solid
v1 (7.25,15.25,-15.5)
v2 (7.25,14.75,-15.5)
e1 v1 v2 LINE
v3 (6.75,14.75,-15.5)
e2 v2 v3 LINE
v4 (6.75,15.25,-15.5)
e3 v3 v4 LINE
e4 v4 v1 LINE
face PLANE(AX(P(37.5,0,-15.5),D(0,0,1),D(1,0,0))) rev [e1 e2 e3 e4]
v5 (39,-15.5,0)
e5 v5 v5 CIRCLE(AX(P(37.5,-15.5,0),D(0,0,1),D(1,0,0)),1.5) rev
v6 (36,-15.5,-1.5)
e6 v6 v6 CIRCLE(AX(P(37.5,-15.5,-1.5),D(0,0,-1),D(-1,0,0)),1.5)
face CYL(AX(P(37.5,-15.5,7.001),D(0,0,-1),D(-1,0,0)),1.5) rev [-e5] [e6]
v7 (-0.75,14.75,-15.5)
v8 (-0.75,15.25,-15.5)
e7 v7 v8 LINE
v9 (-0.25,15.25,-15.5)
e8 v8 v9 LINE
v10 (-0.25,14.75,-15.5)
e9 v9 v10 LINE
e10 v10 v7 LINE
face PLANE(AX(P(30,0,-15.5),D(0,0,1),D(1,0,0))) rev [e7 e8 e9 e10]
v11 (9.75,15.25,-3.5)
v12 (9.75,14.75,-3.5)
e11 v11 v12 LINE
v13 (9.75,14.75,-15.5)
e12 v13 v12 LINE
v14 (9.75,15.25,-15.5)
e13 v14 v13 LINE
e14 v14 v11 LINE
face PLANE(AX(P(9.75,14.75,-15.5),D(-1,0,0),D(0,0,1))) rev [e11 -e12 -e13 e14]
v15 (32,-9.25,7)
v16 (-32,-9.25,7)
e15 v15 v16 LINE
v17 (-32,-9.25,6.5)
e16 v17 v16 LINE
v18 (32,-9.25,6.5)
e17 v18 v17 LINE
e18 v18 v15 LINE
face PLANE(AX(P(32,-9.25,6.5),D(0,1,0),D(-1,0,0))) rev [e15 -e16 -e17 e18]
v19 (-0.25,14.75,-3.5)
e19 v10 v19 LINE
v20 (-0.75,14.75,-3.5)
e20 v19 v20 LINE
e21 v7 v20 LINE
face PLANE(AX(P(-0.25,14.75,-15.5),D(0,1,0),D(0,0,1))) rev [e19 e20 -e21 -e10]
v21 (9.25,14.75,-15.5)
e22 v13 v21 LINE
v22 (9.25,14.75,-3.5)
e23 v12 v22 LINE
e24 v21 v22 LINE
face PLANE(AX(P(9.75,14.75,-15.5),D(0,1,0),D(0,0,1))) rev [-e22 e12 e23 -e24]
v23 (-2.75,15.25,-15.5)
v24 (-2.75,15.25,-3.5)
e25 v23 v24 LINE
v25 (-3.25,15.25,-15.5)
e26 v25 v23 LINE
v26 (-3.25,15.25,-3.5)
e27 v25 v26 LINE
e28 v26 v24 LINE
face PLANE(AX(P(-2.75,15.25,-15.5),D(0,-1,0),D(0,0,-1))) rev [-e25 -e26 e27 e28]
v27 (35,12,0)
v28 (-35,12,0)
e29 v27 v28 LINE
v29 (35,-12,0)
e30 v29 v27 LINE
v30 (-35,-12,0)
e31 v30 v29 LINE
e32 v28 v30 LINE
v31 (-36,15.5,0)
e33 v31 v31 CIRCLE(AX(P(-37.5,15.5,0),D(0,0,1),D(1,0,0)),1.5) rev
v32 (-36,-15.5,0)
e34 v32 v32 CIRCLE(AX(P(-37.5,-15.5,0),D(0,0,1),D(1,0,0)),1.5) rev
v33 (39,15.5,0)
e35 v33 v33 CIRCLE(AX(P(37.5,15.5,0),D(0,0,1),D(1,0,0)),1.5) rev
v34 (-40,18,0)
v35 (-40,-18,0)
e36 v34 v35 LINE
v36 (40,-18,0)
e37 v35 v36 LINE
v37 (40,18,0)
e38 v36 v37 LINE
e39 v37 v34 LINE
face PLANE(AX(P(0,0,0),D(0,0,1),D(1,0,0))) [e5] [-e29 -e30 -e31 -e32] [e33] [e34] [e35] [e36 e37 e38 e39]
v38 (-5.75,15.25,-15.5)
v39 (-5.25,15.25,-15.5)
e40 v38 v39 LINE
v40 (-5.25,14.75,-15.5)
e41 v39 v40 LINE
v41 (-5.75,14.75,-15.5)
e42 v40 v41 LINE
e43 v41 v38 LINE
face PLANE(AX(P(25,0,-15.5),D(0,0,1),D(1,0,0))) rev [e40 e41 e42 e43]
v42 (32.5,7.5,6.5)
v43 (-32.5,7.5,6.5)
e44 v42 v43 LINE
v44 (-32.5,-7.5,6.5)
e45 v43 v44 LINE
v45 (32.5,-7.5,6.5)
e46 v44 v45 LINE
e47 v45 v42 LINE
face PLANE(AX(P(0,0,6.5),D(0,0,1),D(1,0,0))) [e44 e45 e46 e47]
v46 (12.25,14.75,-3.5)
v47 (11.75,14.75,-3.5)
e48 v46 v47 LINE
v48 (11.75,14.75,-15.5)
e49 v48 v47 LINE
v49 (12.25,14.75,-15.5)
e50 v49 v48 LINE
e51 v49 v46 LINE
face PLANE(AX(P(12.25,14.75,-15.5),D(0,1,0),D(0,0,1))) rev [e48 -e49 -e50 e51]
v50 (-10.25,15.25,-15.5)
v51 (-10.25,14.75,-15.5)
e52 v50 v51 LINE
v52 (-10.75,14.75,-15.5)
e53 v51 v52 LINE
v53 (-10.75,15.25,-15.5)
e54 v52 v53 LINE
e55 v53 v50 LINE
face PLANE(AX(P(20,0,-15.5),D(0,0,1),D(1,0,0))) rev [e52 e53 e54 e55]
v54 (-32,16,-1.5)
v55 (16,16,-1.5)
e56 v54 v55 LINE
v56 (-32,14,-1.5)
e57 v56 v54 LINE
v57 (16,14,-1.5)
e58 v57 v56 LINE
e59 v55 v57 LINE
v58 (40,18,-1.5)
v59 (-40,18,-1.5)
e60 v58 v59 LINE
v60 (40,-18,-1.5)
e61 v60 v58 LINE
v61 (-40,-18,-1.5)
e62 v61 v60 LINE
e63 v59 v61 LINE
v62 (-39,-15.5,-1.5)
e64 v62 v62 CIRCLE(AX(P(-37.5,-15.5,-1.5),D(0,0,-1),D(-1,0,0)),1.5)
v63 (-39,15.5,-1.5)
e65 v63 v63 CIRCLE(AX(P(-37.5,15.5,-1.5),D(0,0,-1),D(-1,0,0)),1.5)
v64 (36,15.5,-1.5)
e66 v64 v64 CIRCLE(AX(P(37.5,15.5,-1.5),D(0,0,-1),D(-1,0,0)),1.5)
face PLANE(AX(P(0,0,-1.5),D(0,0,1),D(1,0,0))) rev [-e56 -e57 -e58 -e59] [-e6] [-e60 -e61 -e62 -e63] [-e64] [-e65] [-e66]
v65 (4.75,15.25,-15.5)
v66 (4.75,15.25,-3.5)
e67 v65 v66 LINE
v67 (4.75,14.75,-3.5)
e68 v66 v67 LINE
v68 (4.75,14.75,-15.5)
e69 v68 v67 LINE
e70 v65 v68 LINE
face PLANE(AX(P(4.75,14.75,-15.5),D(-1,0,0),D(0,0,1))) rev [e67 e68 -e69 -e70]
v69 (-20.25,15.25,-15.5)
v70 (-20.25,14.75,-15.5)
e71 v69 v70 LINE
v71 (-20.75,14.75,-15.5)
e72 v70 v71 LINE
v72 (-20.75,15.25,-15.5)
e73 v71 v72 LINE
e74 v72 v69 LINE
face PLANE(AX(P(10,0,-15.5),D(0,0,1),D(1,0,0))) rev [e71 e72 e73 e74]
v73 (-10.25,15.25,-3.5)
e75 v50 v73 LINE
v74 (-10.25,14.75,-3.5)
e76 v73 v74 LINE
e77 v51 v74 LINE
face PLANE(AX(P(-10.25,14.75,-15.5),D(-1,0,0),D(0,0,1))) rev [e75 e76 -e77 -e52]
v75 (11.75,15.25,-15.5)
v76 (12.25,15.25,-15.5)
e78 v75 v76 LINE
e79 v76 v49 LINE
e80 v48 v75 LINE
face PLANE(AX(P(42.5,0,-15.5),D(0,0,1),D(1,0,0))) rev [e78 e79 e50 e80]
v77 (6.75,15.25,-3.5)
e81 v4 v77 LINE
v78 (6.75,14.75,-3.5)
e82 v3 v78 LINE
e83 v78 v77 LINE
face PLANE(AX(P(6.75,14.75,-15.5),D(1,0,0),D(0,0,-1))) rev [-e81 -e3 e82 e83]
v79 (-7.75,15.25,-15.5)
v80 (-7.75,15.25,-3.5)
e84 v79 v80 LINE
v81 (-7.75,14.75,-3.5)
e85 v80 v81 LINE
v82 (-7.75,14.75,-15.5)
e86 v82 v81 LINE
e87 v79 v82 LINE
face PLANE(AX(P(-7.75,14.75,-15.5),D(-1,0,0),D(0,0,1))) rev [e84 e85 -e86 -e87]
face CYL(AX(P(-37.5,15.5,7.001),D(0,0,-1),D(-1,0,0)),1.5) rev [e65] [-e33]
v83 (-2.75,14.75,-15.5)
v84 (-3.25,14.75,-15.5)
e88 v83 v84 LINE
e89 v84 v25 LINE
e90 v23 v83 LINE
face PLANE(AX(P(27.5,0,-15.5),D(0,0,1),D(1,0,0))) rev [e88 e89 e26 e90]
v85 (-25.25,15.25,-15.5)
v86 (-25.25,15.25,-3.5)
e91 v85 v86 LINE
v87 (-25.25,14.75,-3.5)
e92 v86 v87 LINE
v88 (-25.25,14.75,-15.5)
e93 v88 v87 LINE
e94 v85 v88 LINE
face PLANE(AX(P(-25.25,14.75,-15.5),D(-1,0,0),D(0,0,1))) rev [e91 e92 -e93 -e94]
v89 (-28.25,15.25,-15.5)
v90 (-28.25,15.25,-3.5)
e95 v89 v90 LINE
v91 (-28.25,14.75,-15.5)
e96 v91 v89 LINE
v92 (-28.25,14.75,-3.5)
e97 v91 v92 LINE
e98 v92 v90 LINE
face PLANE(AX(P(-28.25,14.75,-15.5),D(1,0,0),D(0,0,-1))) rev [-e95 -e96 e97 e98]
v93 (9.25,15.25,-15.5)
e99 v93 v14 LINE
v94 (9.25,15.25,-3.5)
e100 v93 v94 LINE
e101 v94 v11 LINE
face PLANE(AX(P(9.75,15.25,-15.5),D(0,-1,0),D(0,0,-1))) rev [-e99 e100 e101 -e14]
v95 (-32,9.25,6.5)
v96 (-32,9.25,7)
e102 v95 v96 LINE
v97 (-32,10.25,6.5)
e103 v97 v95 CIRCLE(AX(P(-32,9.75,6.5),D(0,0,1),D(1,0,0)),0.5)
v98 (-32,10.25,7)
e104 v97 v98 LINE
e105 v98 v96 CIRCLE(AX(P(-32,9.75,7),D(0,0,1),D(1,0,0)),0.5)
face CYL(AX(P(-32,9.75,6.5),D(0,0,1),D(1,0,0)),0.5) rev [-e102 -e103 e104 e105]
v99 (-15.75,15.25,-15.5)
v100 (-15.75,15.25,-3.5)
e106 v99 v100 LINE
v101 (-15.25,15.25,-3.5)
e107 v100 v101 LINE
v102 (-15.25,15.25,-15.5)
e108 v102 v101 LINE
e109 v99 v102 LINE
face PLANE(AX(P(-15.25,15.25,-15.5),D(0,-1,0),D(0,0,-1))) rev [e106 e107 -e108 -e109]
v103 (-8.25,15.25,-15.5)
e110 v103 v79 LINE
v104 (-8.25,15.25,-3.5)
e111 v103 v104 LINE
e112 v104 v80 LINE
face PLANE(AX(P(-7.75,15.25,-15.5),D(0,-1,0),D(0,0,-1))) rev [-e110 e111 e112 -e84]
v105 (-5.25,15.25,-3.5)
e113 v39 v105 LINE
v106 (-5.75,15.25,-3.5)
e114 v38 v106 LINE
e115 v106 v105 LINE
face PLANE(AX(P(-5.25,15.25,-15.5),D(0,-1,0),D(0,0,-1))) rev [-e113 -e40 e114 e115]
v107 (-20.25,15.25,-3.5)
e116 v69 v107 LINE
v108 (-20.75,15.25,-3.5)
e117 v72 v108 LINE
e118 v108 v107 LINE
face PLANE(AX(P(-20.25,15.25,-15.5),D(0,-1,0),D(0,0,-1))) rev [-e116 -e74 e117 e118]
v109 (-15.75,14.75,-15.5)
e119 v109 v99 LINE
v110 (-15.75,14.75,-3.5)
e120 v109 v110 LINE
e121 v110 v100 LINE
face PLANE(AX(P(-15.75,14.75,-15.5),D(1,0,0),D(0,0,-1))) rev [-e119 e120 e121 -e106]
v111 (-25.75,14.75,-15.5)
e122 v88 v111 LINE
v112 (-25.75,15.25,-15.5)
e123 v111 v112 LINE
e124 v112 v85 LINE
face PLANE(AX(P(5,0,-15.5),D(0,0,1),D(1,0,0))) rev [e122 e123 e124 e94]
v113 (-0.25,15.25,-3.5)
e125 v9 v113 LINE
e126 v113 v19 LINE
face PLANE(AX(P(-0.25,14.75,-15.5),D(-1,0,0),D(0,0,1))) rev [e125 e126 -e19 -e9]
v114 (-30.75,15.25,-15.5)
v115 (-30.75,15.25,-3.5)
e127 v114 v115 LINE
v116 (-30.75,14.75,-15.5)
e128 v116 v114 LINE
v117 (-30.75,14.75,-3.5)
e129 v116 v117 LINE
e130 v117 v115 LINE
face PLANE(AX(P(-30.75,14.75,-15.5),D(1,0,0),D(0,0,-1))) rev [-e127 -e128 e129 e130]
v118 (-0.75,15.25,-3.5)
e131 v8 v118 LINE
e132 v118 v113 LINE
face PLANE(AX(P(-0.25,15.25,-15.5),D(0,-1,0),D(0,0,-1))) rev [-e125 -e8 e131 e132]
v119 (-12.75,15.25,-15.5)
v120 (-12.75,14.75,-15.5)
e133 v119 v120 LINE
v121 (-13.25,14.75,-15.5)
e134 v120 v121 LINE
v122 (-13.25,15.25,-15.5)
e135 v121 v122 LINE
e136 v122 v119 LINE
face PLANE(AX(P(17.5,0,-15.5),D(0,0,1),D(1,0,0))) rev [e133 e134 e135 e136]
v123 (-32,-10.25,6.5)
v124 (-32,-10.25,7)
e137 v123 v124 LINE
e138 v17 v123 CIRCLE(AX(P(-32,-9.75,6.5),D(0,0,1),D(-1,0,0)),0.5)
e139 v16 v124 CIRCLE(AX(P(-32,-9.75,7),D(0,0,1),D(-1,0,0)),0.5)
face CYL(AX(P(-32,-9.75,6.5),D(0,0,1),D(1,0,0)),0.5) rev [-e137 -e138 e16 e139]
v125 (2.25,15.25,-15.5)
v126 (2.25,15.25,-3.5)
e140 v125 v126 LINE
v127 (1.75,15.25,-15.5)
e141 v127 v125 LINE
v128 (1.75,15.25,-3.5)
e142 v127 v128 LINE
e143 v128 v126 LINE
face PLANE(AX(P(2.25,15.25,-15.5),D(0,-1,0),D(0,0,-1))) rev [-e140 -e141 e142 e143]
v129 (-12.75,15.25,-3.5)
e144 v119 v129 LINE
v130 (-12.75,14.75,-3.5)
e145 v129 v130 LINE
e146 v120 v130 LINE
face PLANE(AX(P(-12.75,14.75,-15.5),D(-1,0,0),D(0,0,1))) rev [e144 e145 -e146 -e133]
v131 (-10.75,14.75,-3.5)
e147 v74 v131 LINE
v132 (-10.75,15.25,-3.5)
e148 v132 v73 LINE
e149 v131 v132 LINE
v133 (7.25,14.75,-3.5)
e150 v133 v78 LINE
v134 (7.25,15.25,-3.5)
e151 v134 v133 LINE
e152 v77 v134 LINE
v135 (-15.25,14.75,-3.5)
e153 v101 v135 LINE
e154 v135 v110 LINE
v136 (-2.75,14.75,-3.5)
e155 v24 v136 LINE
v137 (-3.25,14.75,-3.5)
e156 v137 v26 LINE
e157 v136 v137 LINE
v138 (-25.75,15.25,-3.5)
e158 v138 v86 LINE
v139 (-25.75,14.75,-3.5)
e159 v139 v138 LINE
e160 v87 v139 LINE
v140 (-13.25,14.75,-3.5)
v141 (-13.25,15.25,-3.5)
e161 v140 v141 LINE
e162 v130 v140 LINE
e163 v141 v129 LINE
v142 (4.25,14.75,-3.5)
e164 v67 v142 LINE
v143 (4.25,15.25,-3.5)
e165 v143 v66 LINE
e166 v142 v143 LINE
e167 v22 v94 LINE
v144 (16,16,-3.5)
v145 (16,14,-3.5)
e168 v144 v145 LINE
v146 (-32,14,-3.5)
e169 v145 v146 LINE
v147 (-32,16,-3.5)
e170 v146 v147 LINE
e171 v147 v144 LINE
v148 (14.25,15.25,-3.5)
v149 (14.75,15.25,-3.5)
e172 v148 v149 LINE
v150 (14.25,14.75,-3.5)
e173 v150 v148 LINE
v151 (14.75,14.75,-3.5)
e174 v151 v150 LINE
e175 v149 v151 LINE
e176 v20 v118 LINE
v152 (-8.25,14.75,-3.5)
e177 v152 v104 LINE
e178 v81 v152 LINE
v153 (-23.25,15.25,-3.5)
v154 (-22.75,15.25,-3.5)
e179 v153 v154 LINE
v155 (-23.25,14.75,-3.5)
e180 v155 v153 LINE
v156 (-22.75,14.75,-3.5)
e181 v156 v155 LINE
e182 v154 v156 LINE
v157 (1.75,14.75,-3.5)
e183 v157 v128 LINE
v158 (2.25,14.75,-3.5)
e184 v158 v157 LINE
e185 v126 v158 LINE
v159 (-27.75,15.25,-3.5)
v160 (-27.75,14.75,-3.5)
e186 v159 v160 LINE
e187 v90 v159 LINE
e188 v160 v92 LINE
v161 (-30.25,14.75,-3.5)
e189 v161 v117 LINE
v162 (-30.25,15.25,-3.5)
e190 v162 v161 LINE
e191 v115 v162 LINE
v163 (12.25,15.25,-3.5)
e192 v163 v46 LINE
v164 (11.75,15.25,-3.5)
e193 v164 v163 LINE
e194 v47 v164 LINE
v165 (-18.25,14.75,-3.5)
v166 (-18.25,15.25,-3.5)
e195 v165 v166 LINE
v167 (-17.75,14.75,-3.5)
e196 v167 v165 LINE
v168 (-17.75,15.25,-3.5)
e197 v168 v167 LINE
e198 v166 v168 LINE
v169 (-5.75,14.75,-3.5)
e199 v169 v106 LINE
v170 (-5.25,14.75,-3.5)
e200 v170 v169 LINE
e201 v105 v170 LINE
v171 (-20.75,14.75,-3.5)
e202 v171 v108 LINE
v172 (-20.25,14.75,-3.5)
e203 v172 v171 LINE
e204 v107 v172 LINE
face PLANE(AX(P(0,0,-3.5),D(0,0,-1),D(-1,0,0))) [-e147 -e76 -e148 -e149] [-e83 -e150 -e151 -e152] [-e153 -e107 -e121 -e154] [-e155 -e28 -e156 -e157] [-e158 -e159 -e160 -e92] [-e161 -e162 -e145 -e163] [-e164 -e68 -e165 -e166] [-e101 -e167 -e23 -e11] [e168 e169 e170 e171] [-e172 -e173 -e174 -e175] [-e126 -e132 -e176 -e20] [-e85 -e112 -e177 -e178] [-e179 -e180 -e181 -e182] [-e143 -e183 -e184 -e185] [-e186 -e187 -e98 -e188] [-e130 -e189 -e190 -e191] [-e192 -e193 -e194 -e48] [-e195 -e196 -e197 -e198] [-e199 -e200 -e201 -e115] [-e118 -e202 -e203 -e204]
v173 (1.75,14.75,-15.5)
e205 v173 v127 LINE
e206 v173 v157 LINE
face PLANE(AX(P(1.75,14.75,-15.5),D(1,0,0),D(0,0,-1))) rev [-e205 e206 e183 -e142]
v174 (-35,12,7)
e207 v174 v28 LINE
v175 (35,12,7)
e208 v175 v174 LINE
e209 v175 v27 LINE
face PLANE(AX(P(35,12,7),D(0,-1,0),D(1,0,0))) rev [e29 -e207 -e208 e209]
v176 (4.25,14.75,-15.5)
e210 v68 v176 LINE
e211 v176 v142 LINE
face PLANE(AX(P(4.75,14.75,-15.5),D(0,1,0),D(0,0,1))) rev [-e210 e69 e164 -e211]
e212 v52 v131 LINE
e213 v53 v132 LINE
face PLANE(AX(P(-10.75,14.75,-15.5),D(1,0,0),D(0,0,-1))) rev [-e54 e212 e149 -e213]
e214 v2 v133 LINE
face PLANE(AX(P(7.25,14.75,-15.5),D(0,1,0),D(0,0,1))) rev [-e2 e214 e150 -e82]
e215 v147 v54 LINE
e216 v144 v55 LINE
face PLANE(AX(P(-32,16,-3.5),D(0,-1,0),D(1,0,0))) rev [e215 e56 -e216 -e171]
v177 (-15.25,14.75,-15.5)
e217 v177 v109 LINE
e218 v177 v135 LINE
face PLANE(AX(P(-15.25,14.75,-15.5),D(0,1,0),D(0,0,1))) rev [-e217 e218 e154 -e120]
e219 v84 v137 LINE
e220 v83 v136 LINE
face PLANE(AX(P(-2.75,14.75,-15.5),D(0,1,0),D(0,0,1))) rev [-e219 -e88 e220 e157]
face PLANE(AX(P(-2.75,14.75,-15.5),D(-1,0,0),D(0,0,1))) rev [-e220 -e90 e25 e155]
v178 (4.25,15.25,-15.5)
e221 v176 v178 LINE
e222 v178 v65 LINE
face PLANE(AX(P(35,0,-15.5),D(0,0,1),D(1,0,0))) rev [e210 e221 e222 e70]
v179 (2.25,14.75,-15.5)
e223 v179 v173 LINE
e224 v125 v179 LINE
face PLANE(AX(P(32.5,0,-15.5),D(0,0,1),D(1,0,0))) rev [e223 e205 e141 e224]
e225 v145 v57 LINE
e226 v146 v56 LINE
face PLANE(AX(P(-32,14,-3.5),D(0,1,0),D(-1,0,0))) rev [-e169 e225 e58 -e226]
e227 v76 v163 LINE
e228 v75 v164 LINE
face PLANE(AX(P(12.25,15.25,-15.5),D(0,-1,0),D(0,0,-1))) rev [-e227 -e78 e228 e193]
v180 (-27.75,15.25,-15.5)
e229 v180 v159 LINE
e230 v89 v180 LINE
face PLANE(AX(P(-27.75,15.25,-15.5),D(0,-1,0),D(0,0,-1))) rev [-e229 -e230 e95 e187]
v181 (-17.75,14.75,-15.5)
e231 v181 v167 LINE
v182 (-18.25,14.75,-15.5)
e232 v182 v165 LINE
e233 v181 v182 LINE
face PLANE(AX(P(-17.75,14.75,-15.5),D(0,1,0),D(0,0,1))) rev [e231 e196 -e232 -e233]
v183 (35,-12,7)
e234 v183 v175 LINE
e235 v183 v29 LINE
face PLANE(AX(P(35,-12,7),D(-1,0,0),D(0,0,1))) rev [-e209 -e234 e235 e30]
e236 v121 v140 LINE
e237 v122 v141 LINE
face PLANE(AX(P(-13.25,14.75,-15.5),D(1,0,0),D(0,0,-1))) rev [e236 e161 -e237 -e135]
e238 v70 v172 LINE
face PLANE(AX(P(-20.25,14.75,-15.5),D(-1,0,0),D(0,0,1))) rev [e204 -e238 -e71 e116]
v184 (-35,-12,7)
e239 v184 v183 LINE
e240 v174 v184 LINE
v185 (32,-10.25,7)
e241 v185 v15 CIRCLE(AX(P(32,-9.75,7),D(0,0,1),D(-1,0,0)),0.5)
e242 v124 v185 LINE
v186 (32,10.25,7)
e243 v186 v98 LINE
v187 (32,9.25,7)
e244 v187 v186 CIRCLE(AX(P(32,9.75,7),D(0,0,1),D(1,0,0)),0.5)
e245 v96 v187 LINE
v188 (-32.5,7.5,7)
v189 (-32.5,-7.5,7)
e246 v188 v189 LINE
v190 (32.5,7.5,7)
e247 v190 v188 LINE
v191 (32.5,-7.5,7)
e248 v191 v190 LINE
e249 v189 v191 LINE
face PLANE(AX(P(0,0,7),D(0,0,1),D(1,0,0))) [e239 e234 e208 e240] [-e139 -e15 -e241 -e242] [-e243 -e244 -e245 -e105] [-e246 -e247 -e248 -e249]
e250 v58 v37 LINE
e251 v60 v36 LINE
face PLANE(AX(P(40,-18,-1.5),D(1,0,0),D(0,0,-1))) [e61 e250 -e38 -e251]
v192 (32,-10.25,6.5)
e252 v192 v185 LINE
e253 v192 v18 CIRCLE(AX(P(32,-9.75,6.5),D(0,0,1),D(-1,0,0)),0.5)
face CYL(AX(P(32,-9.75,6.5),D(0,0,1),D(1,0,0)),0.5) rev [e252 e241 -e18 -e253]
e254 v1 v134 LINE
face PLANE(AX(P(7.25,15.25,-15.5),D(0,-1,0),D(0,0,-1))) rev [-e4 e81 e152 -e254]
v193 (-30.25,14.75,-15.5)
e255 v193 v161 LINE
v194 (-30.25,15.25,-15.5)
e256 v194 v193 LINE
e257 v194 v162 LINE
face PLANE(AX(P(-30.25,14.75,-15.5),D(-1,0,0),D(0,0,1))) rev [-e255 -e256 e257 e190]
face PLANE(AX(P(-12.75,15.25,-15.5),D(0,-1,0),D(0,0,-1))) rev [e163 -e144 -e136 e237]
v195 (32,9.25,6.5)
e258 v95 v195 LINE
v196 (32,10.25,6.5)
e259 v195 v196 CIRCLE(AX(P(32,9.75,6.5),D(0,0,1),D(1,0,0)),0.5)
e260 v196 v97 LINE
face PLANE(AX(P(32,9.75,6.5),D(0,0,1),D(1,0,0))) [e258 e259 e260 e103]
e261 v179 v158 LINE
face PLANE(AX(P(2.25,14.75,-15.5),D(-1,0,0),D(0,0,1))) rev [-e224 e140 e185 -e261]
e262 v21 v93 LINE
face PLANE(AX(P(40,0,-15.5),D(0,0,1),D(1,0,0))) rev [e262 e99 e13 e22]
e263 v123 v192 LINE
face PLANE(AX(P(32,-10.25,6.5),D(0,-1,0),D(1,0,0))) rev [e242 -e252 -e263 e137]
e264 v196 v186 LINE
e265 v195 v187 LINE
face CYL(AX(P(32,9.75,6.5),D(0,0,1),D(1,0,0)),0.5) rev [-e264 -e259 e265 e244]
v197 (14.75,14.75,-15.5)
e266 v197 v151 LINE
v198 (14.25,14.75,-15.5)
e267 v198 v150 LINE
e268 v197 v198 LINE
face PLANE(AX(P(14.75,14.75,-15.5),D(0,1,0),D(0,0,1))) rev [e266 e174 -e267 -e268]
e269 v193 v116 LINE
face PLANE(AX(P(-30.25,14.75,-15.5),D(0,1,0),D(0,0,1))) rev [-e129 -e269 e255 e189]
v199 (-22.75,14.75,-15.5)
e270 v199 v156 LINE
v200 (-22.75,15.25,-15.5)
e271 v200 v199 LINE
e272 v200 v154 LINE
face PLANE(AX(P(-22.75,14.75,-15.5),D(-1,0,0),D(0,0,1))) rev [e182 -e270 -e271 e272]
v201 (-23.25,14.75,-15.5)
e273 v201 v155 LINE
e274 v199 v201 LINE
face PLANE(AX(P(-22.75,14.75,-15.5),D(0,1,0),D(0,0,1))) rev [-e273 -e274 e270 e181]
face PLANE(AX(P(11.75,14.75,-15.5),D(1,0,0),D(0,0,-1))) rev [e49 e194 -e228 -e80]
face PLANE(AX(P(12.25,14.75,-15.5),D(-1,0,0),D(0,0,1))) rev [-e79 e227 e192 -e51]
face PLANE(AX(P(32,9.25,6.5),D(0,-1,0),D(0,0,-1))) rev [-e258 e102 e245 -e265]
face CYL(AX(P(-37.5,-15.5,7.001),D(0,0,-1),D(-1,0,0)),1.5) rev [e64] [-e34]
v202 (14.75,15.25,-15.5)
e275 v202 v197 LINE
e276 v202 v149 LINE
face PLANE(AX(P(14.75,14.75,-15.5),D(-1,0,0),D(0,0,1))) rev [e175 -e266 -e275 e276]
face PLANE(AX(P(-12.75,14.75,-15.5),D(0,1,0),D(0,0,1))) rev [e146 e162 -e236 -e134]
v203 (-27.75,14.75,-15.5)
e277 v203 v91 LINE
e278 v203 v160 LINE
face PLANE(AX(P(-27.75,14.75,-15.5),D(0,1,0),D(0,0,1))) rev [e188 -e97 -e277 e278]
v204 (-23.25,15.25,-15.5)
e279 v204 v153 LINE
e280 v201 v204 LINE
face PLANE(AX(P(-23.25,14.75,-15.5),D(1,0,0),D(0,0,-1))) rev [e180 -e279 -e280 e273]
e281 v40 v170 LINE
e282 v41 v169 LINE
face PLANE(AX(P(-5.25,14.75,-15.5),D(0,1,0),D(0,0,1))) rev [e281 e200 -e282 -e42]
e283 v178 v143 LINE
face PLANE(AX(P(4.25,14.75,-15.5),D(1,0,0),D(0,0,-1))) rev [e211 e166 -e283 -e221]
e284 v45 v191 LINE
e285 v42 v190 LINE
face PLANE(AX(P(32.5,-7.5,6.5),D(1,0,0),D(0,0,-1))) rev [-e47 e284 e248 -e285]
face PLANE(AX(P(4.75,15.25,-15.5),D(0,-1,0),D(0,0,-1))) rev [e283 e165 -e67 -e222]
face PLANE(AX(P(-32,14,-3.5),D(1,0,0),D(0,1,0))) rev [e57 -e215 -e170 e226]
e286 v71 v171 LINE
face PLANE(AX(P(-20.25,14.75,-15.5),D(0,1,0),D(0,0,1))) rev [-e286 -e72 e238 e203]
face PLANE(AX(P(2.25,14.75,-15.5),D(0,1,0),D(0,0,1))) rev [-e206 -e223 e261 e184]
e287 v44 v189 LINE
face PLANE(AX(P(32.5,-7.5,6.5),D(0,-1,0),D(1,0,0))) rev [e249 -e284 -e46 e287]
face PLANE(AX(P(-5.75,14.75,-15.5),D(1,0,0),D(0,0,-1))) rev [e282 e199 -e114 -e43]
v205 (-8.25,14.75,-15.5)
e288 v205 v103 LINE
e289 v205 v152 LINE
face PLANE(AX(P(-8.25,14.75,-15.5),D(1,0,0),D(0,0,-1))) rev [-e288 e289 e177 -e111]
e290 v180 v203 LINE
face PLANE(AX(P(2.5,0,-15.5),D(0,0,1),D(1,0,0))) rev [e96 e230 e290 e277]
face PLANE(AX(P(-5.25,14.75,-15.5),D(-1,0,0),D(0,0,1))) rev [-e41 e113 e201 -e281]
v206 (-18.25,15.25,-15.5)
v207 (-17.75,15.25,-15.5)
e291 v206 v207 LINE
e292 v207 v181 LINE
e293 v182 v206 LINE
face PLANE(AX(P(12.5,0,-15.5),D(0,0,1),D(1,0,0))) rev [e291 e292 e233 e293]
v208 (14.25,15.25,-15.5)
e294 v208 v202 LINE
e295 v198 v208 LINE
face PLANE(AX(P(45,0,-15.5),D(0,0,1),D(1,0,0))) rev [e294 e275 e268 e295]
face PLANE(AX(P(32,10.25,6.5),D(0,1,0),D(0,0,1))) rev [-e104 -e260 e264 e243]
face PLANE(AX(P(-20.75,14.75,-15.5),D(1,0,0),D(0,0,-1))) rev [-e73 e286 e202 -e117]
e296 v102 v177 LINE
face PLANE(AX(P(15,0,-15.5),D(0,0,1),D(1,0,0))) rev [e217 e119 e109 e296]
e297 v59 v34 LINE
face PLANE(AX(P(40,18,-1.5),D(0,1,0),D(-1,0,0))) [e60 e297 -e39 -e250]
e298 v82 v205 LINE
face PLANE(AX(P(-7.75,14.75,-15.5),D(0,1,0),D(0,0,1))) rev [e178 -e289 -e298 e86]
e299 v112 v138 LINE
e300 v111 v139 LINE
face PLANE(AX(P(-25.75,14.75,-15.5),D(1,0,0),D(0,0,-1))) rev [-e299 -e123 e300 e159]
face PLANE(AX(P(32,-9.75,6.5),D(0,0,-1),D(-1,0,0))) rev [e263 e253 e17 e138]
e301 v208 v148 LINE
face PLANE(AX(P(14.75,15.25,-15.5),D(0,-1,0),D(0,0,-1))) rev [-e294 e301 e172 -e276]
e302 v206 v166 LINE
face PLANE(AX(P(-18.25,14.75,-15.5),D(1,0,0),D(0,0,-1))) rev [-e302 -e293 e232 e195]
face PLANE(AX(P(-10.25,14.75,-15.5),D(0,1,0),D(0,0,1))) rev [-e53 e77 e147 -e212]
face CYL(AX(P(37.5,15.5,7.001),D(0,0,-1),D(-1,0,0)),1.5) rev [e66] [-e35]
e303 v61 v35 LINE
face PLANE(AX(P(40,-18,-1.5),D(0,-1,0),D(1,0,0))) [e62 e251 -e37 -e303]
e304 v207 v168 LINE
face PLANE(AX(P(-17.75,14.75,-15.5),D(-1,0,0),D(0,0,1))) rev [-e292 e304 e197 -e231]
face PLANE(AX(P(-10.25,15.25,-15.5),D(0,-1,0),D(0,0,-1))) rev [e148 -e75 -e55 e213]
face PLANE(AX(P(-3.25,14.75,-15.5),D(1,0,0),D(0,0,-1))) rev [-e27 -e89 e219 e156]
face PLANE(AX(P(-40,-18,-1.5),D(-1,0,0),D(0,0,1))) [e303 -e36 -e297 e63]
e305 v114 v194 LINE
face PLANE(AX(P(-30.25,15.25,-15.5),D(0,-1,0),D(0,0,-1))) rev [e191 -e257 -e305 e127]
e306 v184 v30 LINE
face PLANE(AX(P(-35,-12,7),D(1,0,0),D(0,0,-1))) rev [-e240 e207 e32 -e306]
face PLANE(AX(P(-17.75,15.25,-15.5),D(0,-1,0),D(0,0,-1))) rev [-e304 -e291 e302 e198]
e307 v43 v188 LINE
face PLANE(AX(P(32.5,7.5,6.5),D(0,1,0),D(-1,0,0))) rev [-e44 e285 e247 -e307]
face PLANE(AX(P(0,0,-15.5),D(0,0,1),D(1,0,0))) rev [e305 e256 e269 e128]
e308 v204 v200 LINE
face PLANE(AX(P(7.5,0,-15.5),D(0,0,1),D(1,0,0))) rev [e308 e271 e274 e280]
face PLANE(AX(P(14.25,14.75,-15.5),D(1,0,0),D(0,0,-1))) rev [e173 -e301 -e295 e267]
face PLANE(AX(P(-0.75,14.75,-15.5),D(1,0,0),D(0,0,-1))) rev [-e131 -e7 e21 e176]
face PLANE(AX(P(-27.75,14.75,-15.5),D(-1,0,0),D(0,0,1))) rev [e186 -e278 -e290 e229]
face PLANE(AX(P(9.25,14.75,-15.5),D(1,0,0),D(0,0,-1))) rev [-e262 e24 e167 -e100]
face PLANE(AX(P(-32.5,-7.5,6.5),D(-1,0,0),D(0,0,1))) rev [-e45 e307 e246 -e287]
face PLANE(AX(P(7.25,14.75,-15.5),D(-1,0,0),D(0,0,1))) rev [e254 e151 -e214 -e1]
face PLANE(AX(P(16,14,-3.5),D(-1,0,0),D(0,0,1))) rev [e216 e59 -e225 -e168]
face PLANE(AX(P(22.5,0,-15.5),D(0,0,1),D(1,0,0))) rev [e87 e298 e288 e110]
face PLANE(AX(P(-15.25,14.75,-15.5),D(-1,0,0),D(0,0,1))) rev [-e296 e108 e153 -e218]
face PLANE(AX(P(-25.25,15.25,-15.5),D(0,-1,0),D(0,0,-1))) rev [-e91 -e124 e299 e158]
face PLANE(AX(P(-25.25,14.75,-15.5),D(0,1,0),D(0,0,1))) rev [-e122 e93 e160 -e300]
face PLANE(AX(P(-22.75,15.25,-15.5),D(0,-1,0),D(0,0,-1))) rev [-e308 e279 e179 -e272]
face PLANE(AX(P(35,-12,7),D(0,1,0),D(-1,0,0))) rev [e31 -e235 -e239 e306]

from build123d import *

# Parameters (mm, degrees)
SKETCH1_W           = 80
SKETCH1_H           = 36
BASE_FLANGE1_DEPTH  = 1.5
SKETCH6_W           = 70
SKETCH6_H           = 24
BOSS_EXTRUDE1_DEPTH = 7
SKETCH7_W           = 65
SKETCH7_H           = 15
CUT_EXTRUDE1_DEPTH  = 0.5
CUT_EXTRUDE2_DEPTH  = 0.5
CUT_EXTRUDE3_REACH  = 46.679
SKETCH9_R           = 1.5
SKETCH10_W          = 48
SKETCH10_H          = 2
BOSS_EXTRUDE2_DEPTH = 2
SKETCH11_W          = 0.5
SKETCH11_H          = 0.5
BOSS_EXTRUDE3_DEPTH = 12
LPATTERN1_COUNT     = 19
LPATTERN1_PITCH     = 2.5


# Sheet-metal steps are written as plain solids
with BuildPart() as part:
    # Sketch1 → Base-Flange1 (new body)
    with BuildSketch(Plane.XY):
        Rectangle(SKETCH1_W, SKETCH1_H)
    extrude(amount=-BASE_FLANGE1_DEPTH)

    # Sketch6 → Boss-Extrude1 (add)
    with BuildSketch(Plane.XY):
        Rectangle(SKETCH6_W, SKETCH6_H)
    extrude(amount=BOSS_EXTRUDE1_DEPTH)

    # Sketch7 → Cut-Extrude1 (cut)
    with BuildSketch(Plane.XY.offset(7)):
        Rectangle(SKETCH7_W, SKETCH7_H)
    extrude(amount=-CUT_EXTRUDE1_DEPTH, mode=Mode.SUBTRACT)

    # Sketch8 → Cut-Extrude2 (cut)
    with BuildSketch(Plane.XY.offset(7)):
        with BuildLine():
            Line((32, 9.25), (-32, 9.25))
            ThreePointArc((-32, 9.25), (-32.5, 9.75), (-32, 10.25))
            Line((-32, 10.25), (32, 10.25))
            ThreePointArc((32, 10.25), (32.5, 9.75), (32, 9.25))
        make_face()
        with BuildLine():
            Line((32, -9.25), (-32, -9.25))
            ThreePointArc((-32, -9.25), (-32.5, -9.75), (-32, -10.25))
            Line((-32, -10.25), (32, -10.25))
            ThreePointArc((32, -10.25), (32.5, -9.75), (32, -9.25))
        make_face()
    extrude(amount=-CUT_EXTRUDE2_DEPTH, mode=Mode.SUBTRACT)

    # Sketch9 → Cut-Extrude3 (cut, up to next)
    with BuildSketch(Plane(origin=(0, 0, -1.5), x_dir=(-1, 0, 0), z_dir=(0, 0, -1)), mode=Mode.PRIVATE) as cut_extrude3_sk1:
        with Locations((-37.5, 15.5)):
            Circle(SKETCH9_R)
    cut_extrude3_tool1 = extrude(cut_extrude3_sk1.sketch, amount=-CUT_EXTRUDE3_REACH, mode=Mode.PRIVATE) & part.part
    # Sketch9 → Cut-Extrude3 (cut, up to next)
    with BuildSketch(Plane(origin=(0, 0, -1.5), x_dir=(-1, 0, 0), z_dir=(0, 0, -1)), mode=Mode.PRIVATE) as cut_extrude3_sk2:
        with Locations((-37.5, -15.5)):
            Circle(SKETCH9_R)
    cut_extrude3_tool2 = extrude(cut_extrude3_sk2.sketch, amount=-CUT_EXTRUDE3_REACH, mode=Mode.PRIVATE) & part.part
    # Sketch9 → Cut-Extrude3 (cut, up to next)
    with BuildSketch(Plane(origin=(0, 0, -1.5), x_dir=(-1, 0, 0), z_dir=(0, 0, -1)), mode=Mode.PRIVATE) as cut_extrude3_sk3:
        with Locations((37.5, 15.5)):
            Circle(SKETCH9_R)
    cut_extrude3_tool3 = extrude(cut_extrude3_sk3.sketch, amount=-CUT_EXTRUDE3_REACH, mode=Mode.PRIVATE) & part.part
    # Sketch9 → Cut-Extrude3 (cut, up to next)
    with BuildSketch(Plane(origin=(0, 0, -1.5), x_dir=(-1, 0, 0), z_dir=(0, 0, -1)), mode=Mode.PRIVATE) as cut_extrude3_sk4:
        with Locations((37.5, -15.5)):
            Circle(SKETCH9_R)
    cut_extrude3_tool4 = extrude(cut_extrude3_sk4.sketch, amount=-CUT_EXTRUDE3_REACH, mode=Mode.PRIVATE) & part.part
    add(cut_extrude3_tool1.solids().sort_by_distance((37.5, 15.5, -1.5))[0], mode=Mode.SUBTRACT)
    add(cut_extrude3_tool2.solids().sort_by_distance((37.5, -15.5, -1.5))[0], mode=Mode.SUBTRACT)
    add(cut_extrude3_tool3.solids().sort_by_distance((-37.5, 15.5, -1.5))[0], mode=Mode.SUBTRACT)
    add(cut_extrude3_tool4.solids().sort_by_distance((-37.5, -15.5, -1.5))[0], mode=Mode.SUBTRACT)

    # Sketch10 → Boss-Extrude2 (add)
    with BuildSketch(Plane(origin=(0, 0, -1.5), x_dir=(-1, 0, 0), z_dir=(0, 0, -1))):
        with Locations((8, 15)):
            Rectangle(SKETCH10_W, SKETCH10_H)
    extrude(amount=BOSS_EXTRUDE2_DEPTH)

    # Sketch11 → Boss-Extrude3 (add)
    with BuildSketch(Plane(origin=(0, 0, -3.5), x_dir=(-1, 0, 0), z_dir=(0, 0, -1))):
        with Locations((30.5, 15)):
            Rectangle(SKETCH11_W, SKETCH11_H)
    boss_extrude3 = extrude(amount=BOSS_EXTRUDE3_DEPTH)

    # LPattern1: Boss-Extrude3 ×19
    with Locations(*[(i * LPATTERN1_PITCH, 0, 0) for i in range(1, LPATTERN1_COUNT)]):
        add(boss_extrude3)


solid = part.part
